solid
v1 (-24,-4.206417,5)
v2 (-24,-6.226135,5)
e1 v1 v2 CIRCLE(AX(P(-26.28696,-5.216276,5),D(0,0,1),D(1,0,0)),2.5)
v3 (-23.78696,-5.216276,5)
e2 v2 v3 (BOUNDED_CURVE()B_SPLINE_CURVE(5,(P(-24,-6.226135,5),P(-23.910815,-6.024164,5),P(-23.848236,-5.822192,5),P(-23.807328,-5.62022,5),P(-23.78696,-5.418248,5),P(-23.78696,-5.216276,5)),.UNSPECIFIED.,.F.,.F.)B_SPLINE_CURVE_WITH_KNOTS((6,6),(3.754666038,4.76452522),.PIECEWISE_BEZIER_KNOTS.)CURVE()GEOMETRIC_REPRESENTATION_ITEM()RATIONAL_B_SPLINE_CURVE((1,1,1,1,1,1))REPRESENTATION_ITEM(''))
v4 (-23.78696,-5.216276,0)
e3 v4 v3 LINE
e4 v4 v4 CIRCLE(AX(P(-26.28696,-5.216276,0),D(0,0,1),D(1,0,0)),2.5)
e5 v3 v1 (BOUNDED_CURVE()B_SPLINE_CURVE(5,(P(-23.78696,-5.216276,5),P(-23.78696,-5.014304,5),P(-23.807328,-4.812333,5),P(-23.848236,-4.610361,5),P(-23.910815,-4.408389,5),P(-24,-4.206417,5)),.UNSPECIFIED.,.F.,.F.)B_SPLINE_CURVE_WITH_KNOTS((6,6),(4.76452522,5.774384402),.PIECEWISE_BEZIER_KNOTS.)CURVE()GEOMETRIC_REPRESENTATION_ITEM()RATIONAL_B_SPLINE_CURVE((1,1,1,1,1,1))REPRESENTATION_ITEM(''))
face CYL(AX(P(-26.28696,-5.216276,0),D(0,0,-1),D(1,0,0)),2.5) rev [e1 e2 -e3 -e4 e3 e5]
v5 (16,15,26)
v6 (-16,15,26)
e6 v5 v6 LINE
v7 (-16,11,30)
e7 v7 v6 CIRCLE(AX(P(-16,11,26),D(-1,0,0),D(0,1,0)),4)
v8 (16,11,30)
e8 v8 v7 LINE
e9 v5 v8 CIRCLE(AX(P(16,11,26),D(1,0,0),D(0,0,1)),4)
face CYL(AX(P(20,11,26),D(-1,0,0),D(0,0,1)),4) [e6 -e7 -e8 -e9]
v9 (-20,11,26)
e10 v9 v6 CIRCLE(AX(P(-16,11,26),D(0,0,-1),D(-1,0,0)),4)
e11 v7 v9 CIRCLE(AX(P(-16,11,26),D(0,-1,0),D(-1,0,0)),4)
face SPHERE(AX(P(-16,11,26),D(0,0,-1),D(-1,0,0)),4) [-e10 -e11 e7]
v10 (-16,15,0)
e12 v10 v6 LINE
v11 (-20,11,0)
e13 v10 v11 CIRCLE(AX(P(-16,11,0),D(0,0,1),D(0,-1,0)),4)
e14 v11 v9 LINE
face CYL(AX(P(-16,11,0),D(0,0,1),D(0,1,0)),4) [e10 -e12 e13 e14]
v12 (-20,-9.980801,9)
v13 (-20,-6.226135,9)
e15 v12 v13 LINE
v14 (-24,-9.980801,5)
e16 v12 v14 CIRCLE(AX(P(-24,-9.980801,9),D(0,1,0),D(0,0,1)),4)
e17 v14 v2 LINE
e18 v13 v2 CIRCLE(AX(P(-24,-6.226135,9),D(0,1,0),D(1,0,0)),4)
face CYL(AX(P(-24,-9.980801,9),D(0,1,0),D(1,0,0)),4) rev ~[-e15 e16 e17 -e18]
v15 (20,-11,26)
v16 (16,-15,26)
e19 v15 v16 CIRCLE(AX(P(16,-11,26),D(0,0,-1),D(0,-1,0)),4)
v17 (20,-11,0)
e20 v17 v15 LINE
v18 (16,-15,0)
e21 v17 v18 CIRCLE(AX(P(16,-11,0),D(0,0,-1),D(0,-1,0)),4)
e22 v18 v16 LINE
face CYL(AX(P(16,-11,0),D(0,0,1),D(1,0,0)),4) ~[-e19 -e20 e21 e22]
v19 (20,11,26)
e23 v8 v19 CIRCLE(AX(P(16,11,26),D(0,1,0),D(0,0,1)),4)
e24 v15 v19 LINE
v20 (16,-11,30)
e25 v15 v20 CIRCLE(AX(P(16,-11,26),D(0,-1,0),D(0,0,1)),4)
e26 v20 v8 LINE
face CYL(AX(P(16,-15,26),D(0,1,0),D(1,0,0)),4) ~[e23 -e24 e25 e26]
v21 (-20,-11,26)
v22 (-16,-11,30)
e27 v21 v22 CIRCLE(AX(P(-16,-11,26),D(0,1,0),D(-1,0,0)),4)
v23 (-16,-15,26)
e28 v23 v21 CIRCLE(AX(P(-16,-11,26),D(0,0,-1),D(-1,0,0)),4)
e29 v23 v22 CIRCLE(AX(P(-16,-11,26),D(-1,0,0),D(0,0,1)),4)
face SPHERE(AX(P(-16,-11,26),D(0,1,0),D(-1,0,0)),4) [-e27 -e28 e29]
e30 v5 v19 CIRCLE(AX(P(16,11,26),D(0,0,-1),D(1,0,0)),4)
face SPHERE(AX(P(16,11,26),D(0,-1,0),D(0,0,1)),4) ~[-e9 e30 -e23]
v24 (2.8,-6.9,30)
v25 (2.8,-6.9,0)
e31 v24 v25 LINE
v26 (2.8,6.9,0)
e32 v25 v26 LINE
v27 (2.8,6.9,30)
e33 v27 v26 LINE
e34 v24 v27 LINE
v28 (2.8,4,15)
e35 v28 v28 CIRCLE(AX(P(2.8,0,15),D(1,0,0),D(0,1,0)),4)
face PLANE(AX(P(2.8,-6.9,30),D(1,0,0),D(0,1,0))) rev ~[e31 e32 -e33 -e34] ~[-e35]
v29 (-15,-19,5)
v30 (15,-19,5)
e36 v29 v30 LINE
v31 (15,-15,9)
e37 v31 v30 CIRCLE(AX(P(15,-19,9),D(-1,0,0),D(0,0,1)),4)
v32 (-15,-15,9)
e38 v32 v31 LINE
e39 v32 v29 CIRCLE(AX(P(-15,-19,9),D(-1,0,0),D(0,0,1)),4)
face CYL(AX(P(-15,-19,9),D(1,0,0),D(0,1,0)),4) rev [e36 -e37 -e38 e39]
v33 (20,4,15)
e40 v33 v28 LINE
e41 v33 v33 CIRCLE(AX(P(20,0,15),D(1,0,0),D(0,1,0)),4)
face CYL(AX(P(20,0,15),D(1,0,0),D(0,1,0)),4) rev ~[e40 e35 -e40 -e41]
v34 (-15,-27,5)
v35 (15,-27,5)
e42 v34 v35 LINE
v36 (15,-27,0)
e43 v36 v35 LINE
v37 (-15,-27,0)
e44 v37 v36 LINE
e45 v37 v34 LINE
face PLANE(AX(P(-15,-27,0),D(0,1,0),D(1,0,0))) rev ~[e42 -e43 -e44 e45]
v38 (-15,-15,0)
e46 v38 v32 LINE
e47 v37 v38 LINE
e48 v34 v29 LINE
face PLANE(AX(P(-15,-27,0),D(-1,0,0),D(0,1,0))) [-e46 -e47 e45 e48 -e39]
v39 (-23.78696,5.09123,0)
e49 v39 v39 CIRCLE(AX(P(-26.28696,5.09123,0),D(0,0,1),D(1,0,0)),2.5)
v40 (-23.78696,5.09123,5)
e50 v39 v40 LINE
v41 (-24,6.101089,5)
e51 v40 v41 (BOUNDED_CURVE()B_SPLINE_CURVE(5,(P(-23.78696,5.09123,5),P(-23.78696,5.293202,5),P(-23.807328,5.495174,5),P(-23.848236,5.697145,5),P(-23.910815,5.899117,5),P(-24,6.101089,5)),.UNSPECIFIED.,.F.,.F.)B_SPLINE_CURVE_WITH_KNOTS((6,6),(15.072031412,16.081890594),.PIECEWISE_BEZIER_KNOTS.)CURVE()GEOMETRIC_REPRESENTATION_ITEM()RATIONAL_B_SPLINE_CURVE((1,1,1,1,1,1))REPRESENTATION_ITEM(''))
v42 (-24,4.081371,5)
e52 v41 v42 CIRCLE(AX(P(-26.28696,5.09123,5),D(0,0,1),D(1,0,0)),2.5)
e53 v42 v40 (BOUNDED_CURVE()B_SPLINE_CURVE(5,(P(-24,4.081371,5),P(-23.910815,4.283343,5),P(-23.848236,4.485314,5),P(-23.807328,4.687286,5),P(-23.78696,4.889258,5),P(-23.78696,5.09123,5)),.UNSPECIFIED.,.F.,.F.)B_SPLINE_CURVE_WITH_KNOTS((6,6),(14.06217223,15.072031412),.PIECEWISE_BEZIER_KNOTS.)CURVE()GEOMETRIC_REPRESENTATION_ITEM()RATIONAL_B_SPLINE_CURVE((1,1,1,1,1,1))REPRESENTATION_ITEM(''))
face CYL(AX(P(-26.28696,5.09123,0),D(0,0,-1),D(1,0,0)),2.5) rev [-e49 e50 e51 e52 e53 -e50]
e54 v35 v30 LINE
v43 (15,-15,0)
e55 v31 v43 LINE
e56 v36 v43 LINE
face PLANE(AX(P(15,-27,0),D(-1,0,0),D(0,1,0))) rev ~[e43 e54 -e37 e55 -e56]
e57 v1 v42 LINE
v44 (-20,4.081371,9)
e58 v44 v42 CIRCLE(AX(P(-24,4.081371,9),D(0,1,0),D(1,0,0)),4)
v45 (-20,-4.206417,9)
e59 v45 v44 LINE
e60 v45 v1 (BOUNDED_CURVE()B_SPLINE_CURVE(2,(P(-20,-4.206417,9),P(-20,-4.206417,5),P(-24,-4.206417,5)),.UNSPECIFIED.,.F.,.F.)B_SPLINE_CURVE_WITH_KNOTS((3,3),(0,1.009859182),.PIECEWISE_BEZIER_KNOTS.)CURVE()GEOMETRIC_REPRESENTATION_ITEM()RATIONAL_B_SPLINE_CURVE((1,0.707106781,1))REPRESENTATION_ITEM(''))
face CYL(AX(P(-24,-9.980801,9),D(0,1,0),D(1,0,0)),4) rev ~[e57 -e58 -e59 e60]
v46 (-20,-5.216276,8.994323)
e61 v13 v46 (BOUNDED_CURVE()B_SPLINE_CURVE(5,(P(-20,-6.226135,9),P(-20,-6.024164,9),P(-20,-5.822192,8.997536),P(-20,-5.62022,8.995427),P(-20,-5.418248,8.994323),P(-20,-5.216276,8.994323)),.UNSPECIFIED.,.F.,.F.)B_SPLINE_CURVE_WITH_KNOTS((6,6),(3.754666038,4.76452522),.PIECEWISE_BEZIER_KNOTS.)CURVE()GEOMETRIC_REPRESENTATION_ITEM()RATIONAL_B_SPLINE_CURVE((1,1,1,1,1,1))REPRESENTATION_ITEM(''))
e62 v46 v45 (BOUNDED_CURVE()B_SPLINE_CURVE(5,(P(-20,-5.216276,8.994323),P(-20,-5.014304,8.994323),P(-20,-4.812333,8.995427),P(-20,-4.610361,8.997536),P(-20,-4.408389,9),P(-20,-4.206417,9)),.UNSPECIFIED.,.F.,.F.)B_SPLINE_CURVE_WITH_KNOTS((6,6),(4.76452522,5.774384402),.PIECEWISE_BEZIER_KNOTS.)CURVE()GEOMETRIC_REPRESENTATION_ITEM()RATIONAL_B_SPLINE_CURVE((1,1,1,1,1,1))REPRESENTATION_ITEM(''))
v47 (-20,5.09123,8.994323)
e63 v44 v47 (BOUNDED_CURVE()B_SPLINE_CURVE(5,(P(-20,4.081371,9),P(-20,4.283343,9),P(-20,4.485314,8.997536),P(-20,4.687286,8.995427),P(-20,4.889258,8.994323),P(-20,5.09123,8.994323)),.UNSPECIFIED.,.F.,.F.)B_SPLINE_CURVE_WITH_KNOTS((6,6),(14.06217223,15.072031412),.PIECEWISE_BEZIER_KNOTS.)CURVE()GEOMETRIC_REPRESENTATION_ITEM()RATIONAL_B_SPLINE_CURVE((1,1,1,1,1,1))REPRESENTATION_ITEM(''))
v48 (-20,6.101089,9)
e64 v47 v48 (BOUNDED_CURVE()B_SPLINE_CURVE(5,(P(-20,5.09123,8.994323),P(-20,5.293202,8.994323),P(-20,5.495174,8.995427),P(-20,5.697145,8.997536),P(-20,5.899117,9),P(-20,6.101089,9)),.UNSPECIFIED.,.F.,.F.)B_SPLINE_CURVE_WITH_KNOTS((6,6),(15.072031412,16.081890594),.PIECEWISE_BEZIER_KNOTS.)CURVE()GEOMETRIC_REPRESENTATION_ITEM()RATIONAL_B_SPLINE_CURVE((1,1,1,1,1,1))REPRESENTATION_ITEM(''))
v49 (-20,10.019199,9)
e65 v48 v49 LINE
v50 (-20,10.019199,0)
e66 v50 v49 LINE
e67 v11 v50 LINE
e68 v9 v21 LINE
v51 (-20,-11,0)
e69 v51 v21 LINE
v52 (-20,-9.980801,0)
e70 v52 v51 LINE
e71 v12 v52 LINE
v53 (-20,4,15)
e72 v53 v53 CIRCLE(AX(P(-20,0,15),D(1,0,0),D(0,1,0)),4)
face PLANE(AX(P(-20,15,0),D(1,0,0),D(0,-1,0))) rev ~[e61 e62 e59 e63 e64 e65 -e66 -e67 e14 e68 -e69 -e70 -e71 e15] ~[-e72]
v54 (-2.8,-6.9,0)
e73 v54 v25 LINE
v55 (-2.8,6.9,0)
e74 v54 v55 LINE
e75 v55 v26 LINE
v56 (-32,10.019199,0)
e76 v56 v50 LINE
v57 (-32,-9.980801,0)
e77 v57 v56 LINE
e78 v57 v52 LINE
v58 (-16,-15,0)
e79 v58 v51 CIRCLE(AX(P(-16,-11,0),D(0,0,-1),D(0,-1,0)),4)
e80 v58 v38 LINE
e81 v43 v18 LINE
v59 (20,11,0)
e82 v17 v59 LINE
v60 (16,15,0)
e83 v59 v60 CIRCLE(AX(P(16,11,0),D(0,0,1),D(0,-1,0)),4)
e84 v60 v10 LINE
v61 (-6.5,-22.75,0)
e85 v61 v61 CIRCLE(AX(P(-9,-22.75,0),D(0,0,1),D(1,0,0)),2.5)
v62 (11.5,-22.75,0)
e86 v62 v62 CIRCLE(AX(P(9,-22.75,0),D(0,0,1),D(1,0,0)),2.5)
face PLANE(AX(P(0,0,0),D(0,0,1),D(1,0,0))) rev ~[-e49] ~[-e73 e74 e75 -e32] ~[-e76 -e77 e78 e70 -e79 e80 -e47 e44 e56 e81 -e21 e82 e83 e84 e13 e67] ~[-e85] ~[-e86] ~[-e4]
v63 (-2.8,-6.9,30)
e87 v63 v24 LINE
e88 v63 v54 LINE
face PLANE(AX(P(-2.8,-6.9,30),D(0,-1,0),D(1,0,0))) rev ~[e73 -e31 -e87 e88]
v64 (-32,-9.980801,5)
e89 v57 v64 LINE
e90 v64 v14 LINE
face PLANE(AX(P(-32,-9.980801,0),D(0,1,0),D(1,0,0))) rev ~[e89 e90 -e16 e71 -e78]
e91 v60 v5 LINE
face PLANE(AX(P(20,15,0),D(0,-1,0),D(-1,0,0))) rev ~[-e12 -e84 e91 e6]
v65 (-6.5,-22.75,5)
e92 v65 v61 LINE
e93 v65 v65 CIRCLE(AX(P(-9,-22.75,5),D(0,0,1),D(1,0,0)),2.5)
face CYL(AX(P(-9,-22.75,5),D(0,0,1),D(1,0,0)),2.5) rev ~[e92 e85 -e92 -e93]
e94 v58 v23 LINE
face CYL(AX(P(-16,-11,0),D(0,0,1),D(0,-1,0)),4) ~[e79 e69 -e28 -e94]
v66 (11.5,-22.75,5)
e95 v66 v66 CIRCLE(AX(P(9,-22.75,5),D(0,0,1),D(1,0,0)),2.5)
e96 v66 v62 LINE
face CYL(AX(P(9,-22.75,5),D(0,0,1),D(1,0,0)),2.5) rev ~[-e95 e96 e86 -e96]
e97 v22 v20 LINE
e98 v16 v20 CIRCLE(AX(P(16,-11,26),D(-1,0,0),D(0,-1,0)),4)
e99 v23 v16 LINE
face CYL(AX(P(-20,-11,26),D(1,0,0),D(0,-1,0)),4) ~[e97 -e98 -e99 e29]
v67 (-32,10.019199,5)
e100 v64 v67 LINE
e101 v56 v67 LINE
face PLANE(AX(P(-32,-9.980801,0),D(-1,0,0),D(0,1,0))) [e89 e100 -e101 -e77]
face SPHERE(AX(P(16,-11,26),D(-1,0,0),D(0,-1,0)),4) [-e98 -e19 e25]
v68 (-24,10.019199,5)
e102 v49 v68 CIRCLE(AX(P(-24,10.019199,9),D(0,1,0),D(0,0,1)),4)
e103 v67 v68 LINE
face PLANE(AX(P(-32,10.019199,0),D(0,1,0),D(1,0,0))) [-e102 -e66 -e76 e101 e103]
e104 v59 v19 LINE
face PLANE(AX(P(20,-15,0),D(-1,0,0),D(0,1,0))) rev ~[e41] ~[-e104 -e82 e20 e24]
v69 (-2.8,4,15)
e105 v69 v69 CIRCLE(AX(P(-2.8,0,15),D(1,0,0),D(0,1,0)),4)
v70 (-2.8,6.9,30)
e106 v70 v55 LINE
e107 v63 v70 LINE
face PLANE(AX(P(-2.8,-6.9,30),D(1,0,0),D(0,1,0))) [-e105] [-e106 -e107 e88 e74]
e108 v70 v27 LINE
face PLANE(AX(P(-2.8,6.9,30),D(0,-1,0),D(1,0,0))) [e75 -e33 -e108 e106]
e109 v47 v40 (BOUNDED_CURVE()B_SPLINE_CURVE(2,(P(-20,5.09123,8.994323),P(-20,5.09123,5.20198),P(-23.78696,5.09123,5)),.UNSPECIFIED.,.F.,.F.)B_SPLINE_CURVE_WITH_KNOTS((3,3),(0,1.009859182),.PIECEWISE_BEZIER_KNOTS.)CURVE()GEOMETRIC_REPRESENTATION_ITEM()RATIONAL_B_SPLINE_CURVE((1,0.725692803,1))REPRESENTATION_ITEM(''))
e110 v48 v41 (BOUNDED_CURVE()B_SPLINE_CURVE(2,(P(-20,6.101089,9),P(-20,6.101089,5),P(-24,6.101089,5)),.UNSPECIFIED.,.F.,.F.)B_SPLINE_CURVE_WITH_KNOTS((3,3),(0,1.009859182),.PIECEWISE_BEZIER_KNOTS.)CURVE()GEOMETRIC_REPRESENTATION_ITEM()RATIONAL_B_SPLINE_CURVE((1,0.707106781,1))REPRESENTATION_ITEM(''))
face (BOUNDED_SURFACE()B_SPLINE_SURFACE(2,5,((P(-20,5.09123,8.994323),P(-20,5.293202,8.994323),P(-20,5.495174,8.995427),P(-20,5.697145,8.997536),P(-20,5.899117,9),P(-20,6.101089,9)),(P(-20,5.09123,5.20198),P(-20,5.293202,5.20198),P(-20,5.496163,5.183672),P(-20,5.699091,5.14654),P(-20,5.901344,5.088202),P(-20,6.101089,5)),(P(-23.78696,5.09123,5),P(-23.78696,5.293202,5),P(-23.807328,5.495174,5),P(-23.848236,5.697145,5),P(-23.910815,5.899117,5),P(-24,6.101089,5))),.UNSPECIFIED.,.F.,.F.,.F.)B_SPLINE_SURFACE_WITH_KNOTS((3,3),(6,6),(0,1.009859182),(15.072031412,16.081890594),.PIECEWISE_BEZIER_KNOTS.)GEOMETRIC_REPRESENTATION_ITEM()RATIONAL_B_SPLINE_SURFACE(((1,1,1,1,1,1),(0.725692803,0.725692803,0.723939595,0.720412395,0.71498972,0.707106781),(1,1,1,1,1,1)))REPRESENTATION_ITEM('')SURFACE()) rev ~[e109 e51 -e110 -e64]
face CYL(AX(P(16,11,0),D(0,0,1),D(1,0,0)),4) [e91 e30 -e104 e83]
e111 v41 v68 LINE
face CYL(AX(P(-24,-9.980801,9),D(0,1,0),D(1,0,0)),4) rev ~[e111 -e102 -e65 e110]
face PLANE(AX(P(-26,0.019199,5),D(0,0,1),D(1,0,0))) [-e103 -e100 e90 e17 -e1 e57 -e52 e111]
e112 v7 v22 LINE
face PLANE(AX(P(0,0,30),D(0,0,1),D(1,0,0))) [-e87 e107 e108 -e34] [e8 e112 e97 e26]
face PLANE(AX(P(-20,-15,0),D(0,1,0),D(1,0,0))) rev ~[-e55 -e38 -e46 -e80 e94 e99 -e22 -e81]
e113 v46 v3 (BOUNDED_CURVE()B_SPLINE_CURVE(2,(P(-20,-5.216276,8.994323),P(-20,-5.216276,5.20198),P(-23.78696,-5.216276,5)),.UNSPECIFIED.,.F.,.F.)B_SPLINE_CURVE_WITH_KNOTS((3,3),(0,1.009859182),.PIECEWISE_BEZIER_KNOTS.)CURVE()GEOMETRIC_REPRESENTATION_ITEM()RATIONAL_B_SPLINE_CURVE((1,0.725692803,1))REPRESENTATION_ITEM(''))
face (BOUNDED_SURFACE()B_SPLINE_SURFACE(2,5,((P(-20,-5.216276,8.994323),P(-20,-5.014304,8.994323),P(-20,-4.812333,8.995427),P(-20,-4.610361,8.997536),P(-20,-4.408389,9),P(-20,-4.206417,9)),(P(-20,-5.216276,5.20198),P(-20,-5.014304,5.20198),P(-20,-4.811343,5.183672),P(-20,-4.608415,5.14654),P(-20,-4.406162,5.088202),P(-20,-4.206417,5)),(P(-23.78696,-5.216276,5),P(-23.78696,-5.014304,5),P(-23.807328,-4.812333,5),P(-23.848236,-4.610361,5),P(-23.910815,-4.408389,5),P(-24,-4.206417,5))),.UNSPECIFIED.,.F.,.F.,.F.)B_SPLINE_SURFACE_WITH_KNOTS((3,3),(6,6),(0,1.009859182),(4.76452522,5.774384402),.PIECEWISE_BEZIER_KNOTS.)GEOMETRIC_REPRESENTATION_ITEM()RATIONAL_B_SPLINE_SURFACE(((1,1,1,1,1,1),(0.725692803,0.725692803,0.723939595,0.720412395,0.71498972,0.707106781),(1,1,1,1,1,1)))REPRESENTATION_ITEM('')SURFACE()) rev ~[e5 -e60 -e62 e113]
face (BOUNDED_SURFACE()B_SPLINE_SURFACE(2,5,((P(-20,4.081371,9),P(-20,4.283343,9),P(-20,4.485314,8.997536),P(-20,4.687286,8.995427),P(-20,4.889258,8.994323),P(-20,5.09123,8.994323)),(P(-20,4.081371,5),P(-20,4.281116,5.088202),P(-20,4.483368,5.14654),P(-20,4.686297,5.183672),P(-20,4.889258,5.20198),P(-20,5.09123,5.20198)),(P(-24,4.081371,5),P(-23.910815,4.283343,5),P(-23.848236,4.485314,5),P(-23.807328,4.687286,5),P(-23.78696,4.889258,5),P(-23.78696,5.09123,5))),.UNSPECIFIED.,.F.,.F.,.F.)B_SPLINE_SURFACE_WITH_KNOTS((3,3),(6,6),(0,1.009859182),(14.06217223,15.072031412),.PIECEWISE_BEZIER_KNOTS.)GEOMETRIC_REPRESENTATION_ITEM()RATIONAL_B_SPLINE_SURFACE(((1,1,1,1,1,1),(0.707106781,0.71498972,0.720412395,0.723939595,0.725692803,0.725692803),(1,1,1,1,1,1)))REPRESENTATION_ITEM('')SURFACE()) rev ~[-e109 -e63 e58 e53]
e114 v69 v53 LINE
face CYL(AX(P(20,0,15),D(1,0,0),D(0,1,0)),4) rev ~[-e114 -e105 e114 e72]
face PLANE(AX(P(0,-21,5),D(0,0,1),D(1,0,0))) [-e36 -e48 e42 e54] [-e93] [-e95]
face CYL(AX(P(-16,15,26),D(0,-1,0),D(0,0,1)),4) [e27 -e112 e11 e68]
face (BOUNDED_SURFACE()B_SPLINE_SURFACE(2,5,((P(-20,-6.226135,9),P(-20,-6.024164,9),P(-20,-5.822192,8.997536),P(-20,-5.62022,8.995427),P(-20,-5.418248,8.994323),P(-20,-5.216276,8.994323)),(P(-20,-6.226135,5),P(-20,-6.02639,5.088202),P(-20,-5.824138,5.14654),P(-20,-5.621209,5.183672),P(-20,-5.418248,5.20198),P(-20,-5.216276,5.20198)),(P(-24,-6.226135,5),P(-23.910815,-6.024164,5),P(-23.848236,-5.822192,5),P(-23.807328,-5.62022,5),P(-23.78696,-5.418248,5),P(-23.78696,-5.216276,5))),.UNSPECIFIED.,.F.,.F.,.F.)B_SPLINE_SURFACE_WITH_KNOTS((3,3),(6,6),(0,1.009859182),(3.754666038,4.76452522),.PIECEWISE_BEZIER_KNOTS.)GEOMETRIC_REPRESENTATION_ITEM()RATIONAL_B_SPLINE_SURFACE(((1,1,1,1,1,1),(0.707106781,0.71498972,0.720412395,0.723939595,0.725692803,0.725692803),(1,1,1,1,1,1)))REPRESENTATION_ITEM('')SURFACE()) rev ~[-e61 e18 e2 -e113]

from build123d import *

# Parameters (mm, degrees)
F1_DEPTH = 30
F0_W     = 30
F0_H     = 12
F2_DEPTH = 5
F3_R     = 4
F4_DEPTH = 40.001
F5_R     = 2.5
F6_DEPTH = 5.001
F7_W     = 5.6
F7_H     = 13.8
F8_DEPTH = 30.001
F0_W_2   = 12
F0_H_2   = 20
F0_R     = 2.5
F9_DEPTH = 5
F10_R    = 4


# Not quite as in the source:
# - a feature names something its author has since deleted; it is built from what else it names


with BuildPart() as f1:
    # F0 (on Top) → F1 (new body)
    with BuildSketch(Plane.XY):
        Polygon((15, -15), (20, -15), (20, 15), (-20, 15), (-20, 10.0191985071), (-20, -9.9808014929), (-20, -15), (-15, -15), align=None)
    extrude(amount=F1_DEPTH)

    # F0 (on Top) → F2 (join)
    with BuildSketch(Plane.XY):
        with Locations((0, -21)):
            Rectangle(F0_W, F0_H)
    extrude(amount=F2_DEPTH)

    # F3 (on face) → F4 (cut, through all)
    with BuildSketch(Plane.YZ.offset(20)):
        with Locations((0, 15)):
            Circle(F3_R)
    extrude(amount=-F4_DEPTH, mode=Mode.SUBTRACT)

    # F5 (on face) → F6 (cut, through all)
    with BuildSketch(Plane.XY.offset(5)):
        with Locations((9, -22.75)):
            Circle(F5_R)
        with Locations((-9, -22.75)):
            Circle(F5_R)
    extrude(amount=-F6_DEPTH, mode=Mode.SUBTRACT)

    # F7 (on face) → F8 (cut, through all)
    with BuildSketch(Plane.XY.offset(30)):
        Rectangle(F7_W, F7_H)
    extrude(amount=-F8_DEPTH, mode=Mode.SUBTRACT)

    # F0 (on Top) → F9 (join)
    with BuildSketch(Plane.XY):
        with Locations((-26, 0.0191985071)):
            Rectangle(F0_W_2, F0_H_2)
        with Locations((-26.2869596481, -5.2162762731)):
            Circle(F0_R, mode=Mode.SUBTRACT)
        with Locations((-26.2869596481, 5.0912299193)):
            Circle(F0_R, mode=Mode.SUBTRACT)
    extrude(amount=F9_DEPTH)

    # F10
    f10_edges = [f1.edges().sort_by_distance(p)[0] for p in [
        (-20, 0.019199, 5),
        (-20, 15, 15),
        (-20, 0, 30),
        (-20, -15, 15),
        (0, -15, 5),
        (0, -15, 30),
        (20, -15, 15),
        (20, 0, 30),
        (0, 15, 30),
        (20, 15, 15),
    ]]
    fillet(f10_edges, radius=F10_R)


solid = f1.part
